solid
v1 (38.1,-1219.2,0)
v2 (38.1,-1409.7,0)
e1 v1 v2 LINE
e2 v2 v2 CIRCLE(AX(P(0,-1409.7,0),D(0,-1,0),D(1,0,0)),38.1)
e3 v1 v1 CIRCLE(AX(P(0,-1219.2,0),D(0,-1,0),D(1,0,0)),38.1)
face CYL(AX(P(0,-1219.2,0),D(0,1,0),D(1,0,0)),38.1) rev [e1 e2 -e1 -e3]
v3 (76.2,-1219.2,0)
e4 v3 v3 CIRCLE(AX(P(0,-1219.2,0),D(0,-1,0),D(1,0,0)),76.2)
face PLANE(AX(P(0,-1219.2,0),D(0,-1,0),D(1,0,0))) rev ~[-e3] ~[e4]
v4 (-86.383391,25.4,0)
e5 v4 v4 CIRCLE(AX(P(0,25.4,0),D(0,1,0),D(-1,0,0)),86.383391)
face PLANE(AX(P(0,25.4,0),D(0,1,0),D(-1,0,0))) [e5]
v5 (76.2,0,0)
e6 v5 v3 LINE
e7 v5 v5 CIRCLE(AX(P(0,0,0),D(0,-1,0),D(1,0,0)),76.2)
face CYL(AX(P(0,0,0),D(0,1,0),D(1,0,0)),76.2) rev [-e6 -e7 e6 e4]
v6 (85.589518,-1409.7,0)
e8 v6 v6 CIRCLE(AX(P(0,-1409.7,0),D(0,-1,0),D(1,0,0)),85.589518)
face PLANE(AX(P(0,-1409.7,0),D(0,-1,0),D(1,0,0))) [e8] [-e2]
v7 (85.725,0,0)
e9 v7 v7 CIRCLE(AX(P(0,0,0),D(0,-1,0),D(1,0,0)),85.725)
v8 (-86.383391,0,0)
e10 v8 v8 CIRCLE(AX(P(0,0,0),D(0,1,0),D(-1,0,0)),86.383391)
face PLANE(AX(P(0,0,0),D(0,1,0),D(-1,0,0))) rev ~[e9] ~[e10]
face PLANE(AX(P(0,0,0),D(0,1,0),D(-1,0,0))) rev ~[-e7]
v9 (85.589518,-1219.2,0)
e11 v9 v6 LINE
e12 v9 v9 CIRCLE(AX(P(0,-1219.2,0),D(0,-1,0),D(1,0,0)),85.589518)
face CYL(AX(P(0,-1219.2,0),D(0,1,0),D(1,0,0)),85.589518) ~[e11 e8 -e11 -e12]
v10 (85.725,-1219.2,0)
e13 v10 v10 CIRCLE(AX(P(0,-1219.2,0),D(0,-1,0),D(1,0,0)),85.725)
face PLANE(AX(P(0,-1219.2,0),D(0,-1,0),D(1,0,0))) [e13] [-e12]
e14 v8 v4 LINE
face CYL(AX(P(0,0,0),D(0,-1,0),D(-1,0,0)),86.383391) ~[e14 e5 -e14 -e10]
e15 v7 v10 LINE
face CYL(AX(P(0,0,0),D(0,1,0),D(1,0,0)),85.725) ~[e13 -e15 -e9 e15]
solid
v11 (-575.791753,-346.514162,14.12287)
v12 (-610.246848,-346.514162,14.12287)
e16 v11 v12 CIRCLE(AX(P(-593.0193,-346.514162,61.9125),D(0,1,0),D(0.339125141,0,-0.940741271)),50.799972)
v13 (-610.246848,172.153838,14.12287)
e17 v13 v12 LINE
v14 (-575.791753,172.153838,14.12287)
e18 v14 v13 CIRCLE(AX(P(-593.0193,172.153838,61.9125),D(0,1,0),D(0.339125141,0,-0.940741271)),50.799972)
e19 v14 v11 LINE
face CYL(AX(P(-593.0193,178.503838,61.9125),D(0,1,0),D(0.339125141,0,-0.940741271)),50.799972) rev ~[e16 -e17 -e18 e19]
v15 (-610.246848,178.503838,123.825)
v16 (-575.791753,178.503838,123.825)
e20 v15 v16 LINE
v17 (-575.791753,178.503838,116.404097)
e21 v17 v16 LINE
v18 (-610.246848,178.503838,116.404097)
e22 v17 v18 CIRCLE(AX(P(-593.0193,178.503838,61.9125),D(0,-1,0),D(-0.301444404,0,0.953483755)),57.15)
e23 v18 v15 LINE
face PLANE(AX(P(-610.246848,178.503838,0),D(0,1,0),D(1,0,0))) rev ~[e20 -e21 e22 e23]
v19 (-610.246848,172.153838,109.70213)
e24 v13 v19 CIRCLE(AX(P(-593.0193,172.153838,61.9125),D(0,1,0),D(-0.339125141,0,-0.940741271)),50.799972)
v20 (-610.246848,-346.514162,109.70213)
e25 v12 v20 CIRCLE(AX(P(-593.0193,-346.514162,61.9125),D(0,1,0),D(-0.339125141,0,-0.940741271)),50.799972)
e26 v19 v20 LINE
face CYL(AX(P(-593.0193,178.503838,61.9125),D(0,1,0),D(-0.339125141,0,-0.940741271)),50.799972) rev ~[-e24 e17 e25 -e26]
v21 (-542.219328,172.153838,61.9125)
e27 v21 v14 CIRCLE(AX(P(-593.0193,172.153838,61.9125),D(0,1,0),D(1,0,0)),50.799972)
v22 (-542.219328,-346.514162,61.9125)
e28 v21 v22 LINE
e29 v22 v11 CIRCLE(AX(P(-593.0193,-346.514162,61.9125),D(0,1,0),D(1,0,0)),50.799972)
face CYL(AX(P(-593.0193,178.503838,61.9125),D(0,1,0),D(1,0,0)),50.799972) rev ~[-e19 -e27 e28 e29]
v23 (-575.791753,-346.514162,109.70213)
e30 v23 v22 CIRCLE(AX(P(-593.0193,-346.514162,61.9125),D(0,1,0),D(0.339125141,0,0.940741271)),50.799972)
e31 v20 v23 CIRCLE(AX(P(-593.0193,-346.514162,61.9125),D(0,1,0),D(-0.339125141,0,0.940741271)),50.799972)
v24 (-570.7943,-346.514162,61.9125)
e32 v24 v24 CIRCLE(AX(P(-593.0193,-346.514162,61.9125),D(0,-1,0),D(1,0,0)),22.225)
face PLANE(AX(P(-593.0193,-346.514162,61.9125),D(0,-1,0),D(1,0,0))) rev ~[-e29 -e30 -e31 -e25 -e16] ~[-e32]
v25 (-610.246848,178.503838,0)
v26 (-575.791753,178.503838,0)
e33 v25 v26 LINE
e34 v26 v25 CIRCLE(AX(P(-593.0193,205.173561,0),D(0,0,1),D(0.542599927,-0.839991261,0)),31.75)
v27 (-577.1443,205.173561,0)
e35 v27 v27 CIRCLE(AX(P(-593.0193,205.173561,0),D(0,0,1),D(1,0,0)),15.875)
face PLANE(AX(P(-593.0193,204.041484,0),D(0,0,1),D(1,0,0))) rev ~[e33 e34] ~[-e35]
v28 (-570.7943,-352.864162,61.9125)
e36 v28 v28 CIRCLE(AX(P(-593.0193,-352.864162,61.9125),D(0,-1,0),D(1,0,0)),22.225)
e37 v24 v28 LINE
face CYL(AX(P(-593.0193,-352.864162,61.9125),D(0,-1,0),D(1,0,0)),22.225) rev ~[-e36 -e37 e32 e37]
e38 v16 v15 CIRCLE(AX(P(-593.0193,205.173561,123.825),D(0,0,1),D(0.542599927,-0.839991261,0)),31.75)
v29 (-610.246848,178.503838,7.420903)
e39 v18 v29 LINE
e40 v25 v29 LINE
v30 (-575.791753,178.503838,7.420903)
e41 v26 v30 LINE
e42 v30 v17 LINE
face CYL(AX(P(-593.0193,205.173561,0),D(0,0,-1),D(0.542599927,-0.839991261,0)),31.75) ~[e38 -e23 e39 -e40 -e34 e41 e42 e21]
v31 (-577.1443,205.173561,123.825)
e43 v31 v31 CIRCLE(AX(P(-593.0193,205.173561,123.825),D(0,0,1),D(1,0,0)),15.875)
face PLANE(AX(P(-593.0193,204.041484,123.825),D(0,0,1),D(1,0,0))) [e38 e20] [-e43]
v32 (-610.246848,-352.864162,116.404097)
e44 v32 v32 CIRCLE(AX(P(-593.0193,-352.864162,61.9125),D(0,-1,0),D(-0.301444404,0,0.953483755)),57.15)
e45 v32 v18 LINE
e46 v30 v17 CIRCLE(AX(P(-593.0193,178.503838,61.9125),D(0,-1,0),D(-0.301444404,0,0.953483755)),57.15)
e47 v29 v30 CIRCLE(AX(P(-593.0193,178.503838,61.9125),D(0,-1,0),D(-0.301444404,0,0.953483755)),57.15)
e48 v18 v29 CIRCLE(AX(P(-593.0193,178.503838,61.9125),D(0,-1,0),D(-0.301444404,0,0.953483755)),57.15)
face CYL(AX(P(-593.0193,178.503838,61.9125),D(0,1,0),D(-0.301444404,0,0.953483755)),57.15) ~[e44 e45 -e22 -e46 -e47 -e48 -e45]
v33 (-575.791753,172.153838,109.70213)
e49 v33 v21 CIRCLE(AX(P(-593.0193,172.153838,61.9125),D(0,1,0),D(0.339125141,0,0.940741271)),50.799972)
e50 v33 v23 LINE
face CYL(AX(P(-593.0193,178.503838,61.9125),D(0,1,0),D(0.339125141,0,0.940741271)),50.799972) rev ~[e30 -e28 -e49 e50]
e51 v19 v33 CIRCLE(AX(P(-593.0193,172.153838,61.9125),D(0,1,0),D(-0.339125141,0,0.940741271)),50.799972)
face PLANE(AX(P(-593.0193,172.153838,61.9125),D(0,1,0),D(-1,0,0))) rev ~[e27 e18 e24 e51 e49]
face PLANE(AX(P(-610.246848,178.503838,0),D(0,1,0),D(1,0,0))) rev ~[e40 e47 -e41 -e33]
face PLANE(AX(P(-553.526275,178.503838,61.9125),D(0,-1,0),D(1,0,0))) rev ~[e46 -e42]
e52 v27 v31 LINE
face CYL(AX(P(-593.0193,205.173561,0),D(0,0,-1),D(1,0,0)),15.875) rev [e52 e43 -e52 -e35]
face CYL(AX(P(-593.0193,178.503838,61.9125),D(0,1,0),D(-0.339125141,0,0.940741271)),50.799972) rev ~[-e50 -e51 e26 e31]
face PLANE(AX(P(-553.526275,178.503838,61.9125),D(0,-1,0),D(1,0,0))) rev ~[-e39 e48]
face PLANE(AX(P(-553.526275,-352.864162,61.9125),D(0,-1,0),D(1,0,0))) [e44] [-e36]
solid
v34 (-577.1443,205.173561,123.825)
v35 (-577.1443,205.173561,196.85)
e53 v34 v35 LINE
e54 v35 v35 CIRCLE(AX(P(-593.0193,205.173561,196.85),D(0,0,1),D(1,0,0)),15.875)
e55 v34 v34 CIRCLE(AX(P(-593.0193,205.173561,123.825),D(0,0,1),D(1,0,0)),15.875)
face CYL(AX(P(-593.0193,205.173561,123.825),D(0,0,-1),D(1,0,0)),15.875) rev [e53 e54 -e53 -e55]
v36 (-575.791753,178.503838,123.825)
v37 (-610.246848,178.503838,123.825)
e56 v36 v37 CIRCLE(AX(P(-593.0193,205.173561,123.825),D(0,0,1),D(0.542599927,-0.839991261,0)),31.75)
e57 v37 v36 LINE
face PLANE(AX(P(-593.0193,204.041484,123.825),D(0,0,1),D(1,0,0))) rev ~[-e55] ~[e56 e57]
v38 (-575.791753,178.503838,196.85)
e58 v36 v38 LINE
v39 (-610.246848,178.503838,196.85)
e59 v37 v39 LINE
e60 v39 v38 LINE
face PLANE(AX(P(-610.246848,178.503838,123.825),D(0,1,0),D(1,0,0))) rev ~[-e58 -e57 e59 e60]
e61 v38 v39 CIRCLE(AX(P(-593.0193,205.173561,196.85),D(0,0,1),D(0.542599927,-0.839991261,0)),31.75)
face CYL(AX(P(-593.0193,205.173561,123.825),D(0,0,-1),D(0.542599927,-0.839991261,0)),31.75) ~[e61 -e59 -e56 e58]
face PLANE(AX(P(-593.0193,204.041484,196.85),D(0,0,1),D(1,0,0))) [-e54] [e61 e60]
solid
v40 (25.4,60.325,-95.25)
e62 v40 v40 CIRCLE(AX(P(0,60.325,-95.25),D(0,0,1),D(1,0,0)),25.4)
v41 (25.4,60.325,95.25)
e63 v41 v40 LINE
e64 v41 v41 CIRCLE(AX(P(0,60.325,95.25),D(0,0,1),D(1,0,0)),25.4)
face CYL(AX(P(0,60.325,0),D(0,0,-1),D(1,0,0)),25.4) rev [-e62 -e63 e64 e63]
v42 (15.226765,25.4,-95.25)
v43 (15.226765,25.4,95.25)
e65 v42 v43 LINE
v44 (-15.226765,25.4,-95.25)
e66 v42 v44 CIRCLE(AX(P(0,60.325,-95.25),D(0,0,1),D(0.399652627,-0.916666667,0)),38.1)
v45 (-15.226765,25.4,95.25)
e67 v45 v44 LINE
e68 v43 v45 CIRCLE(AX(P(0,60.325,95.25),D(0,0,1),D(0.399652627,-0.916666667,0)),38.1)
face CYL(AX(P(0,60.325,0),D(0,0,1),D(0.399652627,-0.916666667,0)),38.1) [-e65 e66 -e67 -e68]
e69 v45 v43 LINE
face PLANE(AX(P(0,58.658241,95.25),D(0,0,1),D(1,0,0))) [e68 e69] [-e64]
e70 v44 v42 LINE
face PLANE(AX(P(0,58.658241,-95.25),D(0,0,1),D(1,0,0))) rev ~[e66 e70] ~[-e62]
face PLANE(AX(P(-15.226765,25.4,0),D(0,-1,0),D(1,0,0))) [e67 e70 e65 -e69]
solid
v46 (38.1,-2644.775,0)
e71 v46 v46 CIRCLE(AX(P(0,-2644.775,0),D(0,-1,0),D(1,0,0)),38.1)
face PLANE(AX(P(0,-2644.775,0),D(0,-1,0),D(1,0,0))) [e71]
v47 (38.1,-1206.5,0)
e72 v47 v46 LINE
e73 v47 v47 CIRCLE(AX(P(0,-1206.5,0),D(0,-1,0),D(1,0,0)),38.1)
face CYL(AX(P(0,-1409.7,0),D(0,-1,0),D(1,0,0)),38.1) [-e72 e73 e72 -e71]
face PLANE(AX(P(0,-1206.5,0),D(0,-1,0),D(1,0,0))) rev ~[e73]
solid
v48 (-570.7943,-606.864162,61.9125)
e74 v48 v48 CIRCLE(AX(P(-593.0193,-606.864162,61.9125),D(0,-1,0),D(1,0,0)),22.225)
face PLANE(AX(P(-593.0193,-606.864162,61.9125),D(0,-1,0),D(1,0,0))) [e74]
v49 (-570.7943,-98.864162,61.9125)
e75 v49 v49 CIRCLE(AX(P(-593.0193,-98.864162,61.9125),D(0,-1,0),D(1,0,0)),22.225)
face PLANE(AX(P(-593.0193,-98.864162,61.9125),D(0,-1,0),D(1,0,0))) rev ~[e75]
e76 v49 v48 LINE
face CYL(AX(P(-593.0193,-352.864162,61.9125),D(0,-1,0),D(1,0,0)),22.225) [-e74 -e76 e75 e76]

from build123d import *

# Parameters (mm, degrees)
F0_R          = 85.725
F0_R_2        = 76.2
F1_DEPTH      = 1219.2
F2_R          = 85.5895184233
F2_R_2        = 76.2
F2_R_3        = 38.1
F3_DEPTH      = 190.5
F4_R          = 86.3833911662
F4_R_2        = 85.725
F4_R_3        = 76.2
F5_DEPTH      = 25.4
F6_R          = 25.4
F7_DEPTH      = 95.25
F8_R          = 38.1
F9_DEPTH      = 1235.075
F9_DEPTH_BACK = 203.2
F16_R         = 15.875
F17_DEPTH     = 123.825
F18_DEPTH     = 73.025
F20_DEPTH     = 531.368
F21_R         = 57.15
F22_DEPTH     = 6.35
F23_R         = 56.7654297604
F24_DEPTH     = 6.35
F25_R         = 22.225
F26_DEPTH     = 254


with BuildPart() as f1:
    # F0 (on Front) → F1 (new body)
    with BuildSketch(Plane.XZ):
        Circle(F0_R)
        Circle(F0_R_2, mode=Mode.SUBTRACT)
    extrude(amount=F1_DEPTH)

    # F2 (on face) → F3 (join)
    with BuildSketch(Plane.XZ.offset(1219.2)):
        Circle(F2_R)
        Circle(F2_R_2, mode=Mode.SUBTRACT)
        Circle(F2_R_2)
        Circle(F2_R_3, mode=Mode.SUBTRACT)
    extrude(amount=F3_DEPTH)

    # F4 (on face) → F5 (join)
    with BuildSketch(Plane(origin=(0, 0, 0), x_dir=(-1, 0, 0), z_dir=(0, 1, 0))):
        Circle(F4_R)
        Circle(F4_R_2, mode=Mode.SUBTRACT)
        Circle(F4_R_2)
        Circle(F4_R_3, mode=Mode.SUBTRACT)
        Circle(F4_R_3)
    extrude(amount=F5_DEPTH)


with BuildPart() as f7:
    # F6 (on Top) → F7 (new body, symmetric)
    with BuildSketch(Plane.XY):
        with BuildLine():
            Line((-15.2267650865, 25.4), (15.2267650865, 25.4))
            ThreePointArc((15.2267650865, 25.4), (0, 98.425), (-15.2267650865, 25.4))
        make_face()
        with Locations((0, 60.325)):
            Circle(F6_R, mode=Mode.SUBTRACT)
    extrude(amount=F7_DEPTH, both=True)


with BuildPart() as f9:
    # F8 (on face) → F9 (new body, two sides)
    with BuildSketch(Plane.XZ.offset(1409.7)) as f9_sk:
        Circle(F8_R)
    extrude(amount=F9_DEPTH)
    extrude(f9_sk.sketch, amount=-F9_DEPTH_BACK)


with BuildPart() as f10_1:
    # F10: copy of F1
    add(f1.part.moved(Location((-444.5, 0, 0))))


with BuildPart() as f11_1:
    # F11: copy of F7
    add(f7.part.moved(Location((-347.98, 0, 0))))


with BuildPart() as f12_1:
    # F12: copy of F9
    add(f9.part.moved(Location((-424.18, 0, 0))))


with BuildPart() as f17:
    # F16 (on Top) → F17 (new body)
    with BuildSketch(Plane.XY):
        with BuildLine():
            Line((-610.2468481452, 178.5038380514), (-575.7917527592, 178.5038380514))
            ThreePointArc((-575.7917527592, 178.5038380514), (-593.0193004522, 236.9235605938), (-610.2468481452, 178.5038380514))
        make_face()
        with Locations((-593.0193004522, 205.1735605938)):
            Circle(F16_R, mode=Mode.SUBTRACT)
    extrude(amount=F17_DEPTH)


with BuildPart() as f18:
    # F18 (new): a face of the model
    f18_faces = [f17.part.faces().sort_by_distance(p)[0] for p in [
        (-593.0193004522, 179.3666887907, 123.825),
    ]]
    extrude(f18_faces, amount=F18_DEPTH)


with BuildPart() as f20:
    # F19 (on face) → F20 (new body)
    with BuildSketch(Plane.XZ.offset(-178.5038380514)):
        with BuildLine():
            ThreePointArc((-575.7917527592, 7.4209033957), (-546.9179075738, 28.1370048197), (-535.8693004522, 61.9125))
            ThreePointArc((-535.8693004522, 61.9125), (-546.9179075738, 95.6879951803), (-575.7917527592, 116.4040966043))
            Line((-575.7917527592, 116.4040966043), (-575.7917527592, 109.7021302809))
            ThreePointArc((-575.7917527592, 109.7021302809), (-551.4513073356, 91.1141970426), (-542.2193283862, 61.9125))
            ThreePointArc((-542.2193283862, 61.9125), (-551.4513073356, 32.7108029574), (-575.7917527592, 14.1228697191))
            Line((-575.7917527592, 14.1228697191), (-575.7917527592, 7.4209033957))
        make_face()
        with BuildLine():
            Line((-575.7917527592, 109.7021302809), (-575.7917527592, 116.4040966043))
            ThreePointArc((-575.7917527592, 116.4040966043), (-593.0193004522, 119.0625), (-610.2468481452, 116.4040966043))
            Line((-610.2468481452, 116.4040966043), (-610.2468481452, 109.7021302809))
            ThreePointArc((-610.2468481452, 109.7021302809), (-593.0193004522, 112.712472066), (-575.7917527592, 109.7021302809))
        make_face()
        with BuildLine():
            ThreePointArc((-610.2468481452, 7.4209033957), (-593.0193004522, 4.7625), (-575.7917527592, 7.4209033957))
            Line((-575.7917527592, 7.4209033957), (-575.7917527592, 14.1228697191))
            ThreePointArc((-575.7917527592, 14.1228697191), (-593.0193004522, 11.112527934), (-610.2468481452, 14.1228697191))
            Line((-610.2468481452, 14.1228697191), (-610.2468481452, 7.4209033957))
        make_face()
        with BuildLine():
            Line((-610.2468481452, 109.7021302809), (-610.2468481452, 116.4040966043))
            ThreePointArc((-610.2468481452, 116.4040966043), (-650.1693004522, 61.9125), (-610.2468481452, 7.4209033957))
            Line((-610.2468481452, 7.4209033957), (-610.2468481452, 14.1228697191))
            ThreePointArc((-610.2468481452, 14.1228697191), (-643.8192725182, 61.9125), (-610.2468481452, 109.7021302809))
        make_face()
    extrude(amount=F20_DEPTH)


with BuildPart() as f17_1:
    add(f17.part)

    add(f20.part)  # F22 merges F20
    # F21 (on face) → F22 (join)
    with BuildSketch(Plane(origin=(0, 178.5038380514, 0), x_dir=(-1, 0, 0), z_dir=(0, 1, 0))):
        with Locations((593.0193004522, 61.9125)):
            Circle(F21_R)
    extrude(amount=-F22_DEPTH)

    # F23 (on face) → F24 (join)
    with BuildSketch(Plane.XZ.offset(352.8641619486)):
        with Locations((-593.0193004522, 61.9125)):
            Circle(F23_R)
    extrude(amount=-F24_DEPTH)


with BuildPart() as f26:
    # F25 (on face) → F26 (new body, symmetric)
    with BuildSketch(Plane.XZ.offset(352.8641619486)):
        with Locations((-593.0193004522, 61.9125)):
            Circle(F25_R)
    extrude(amount=F26_DEPTH, both=True)


with BuildPart() as f17_2:
    add(f17_1.part)

    # F27: cut F26
    add(f26.part, mode=Mode.SUBTRACT)


solid = Compound([f1.part, f7.part, f9.part, f18.part, f26.part, f17_2.part])
